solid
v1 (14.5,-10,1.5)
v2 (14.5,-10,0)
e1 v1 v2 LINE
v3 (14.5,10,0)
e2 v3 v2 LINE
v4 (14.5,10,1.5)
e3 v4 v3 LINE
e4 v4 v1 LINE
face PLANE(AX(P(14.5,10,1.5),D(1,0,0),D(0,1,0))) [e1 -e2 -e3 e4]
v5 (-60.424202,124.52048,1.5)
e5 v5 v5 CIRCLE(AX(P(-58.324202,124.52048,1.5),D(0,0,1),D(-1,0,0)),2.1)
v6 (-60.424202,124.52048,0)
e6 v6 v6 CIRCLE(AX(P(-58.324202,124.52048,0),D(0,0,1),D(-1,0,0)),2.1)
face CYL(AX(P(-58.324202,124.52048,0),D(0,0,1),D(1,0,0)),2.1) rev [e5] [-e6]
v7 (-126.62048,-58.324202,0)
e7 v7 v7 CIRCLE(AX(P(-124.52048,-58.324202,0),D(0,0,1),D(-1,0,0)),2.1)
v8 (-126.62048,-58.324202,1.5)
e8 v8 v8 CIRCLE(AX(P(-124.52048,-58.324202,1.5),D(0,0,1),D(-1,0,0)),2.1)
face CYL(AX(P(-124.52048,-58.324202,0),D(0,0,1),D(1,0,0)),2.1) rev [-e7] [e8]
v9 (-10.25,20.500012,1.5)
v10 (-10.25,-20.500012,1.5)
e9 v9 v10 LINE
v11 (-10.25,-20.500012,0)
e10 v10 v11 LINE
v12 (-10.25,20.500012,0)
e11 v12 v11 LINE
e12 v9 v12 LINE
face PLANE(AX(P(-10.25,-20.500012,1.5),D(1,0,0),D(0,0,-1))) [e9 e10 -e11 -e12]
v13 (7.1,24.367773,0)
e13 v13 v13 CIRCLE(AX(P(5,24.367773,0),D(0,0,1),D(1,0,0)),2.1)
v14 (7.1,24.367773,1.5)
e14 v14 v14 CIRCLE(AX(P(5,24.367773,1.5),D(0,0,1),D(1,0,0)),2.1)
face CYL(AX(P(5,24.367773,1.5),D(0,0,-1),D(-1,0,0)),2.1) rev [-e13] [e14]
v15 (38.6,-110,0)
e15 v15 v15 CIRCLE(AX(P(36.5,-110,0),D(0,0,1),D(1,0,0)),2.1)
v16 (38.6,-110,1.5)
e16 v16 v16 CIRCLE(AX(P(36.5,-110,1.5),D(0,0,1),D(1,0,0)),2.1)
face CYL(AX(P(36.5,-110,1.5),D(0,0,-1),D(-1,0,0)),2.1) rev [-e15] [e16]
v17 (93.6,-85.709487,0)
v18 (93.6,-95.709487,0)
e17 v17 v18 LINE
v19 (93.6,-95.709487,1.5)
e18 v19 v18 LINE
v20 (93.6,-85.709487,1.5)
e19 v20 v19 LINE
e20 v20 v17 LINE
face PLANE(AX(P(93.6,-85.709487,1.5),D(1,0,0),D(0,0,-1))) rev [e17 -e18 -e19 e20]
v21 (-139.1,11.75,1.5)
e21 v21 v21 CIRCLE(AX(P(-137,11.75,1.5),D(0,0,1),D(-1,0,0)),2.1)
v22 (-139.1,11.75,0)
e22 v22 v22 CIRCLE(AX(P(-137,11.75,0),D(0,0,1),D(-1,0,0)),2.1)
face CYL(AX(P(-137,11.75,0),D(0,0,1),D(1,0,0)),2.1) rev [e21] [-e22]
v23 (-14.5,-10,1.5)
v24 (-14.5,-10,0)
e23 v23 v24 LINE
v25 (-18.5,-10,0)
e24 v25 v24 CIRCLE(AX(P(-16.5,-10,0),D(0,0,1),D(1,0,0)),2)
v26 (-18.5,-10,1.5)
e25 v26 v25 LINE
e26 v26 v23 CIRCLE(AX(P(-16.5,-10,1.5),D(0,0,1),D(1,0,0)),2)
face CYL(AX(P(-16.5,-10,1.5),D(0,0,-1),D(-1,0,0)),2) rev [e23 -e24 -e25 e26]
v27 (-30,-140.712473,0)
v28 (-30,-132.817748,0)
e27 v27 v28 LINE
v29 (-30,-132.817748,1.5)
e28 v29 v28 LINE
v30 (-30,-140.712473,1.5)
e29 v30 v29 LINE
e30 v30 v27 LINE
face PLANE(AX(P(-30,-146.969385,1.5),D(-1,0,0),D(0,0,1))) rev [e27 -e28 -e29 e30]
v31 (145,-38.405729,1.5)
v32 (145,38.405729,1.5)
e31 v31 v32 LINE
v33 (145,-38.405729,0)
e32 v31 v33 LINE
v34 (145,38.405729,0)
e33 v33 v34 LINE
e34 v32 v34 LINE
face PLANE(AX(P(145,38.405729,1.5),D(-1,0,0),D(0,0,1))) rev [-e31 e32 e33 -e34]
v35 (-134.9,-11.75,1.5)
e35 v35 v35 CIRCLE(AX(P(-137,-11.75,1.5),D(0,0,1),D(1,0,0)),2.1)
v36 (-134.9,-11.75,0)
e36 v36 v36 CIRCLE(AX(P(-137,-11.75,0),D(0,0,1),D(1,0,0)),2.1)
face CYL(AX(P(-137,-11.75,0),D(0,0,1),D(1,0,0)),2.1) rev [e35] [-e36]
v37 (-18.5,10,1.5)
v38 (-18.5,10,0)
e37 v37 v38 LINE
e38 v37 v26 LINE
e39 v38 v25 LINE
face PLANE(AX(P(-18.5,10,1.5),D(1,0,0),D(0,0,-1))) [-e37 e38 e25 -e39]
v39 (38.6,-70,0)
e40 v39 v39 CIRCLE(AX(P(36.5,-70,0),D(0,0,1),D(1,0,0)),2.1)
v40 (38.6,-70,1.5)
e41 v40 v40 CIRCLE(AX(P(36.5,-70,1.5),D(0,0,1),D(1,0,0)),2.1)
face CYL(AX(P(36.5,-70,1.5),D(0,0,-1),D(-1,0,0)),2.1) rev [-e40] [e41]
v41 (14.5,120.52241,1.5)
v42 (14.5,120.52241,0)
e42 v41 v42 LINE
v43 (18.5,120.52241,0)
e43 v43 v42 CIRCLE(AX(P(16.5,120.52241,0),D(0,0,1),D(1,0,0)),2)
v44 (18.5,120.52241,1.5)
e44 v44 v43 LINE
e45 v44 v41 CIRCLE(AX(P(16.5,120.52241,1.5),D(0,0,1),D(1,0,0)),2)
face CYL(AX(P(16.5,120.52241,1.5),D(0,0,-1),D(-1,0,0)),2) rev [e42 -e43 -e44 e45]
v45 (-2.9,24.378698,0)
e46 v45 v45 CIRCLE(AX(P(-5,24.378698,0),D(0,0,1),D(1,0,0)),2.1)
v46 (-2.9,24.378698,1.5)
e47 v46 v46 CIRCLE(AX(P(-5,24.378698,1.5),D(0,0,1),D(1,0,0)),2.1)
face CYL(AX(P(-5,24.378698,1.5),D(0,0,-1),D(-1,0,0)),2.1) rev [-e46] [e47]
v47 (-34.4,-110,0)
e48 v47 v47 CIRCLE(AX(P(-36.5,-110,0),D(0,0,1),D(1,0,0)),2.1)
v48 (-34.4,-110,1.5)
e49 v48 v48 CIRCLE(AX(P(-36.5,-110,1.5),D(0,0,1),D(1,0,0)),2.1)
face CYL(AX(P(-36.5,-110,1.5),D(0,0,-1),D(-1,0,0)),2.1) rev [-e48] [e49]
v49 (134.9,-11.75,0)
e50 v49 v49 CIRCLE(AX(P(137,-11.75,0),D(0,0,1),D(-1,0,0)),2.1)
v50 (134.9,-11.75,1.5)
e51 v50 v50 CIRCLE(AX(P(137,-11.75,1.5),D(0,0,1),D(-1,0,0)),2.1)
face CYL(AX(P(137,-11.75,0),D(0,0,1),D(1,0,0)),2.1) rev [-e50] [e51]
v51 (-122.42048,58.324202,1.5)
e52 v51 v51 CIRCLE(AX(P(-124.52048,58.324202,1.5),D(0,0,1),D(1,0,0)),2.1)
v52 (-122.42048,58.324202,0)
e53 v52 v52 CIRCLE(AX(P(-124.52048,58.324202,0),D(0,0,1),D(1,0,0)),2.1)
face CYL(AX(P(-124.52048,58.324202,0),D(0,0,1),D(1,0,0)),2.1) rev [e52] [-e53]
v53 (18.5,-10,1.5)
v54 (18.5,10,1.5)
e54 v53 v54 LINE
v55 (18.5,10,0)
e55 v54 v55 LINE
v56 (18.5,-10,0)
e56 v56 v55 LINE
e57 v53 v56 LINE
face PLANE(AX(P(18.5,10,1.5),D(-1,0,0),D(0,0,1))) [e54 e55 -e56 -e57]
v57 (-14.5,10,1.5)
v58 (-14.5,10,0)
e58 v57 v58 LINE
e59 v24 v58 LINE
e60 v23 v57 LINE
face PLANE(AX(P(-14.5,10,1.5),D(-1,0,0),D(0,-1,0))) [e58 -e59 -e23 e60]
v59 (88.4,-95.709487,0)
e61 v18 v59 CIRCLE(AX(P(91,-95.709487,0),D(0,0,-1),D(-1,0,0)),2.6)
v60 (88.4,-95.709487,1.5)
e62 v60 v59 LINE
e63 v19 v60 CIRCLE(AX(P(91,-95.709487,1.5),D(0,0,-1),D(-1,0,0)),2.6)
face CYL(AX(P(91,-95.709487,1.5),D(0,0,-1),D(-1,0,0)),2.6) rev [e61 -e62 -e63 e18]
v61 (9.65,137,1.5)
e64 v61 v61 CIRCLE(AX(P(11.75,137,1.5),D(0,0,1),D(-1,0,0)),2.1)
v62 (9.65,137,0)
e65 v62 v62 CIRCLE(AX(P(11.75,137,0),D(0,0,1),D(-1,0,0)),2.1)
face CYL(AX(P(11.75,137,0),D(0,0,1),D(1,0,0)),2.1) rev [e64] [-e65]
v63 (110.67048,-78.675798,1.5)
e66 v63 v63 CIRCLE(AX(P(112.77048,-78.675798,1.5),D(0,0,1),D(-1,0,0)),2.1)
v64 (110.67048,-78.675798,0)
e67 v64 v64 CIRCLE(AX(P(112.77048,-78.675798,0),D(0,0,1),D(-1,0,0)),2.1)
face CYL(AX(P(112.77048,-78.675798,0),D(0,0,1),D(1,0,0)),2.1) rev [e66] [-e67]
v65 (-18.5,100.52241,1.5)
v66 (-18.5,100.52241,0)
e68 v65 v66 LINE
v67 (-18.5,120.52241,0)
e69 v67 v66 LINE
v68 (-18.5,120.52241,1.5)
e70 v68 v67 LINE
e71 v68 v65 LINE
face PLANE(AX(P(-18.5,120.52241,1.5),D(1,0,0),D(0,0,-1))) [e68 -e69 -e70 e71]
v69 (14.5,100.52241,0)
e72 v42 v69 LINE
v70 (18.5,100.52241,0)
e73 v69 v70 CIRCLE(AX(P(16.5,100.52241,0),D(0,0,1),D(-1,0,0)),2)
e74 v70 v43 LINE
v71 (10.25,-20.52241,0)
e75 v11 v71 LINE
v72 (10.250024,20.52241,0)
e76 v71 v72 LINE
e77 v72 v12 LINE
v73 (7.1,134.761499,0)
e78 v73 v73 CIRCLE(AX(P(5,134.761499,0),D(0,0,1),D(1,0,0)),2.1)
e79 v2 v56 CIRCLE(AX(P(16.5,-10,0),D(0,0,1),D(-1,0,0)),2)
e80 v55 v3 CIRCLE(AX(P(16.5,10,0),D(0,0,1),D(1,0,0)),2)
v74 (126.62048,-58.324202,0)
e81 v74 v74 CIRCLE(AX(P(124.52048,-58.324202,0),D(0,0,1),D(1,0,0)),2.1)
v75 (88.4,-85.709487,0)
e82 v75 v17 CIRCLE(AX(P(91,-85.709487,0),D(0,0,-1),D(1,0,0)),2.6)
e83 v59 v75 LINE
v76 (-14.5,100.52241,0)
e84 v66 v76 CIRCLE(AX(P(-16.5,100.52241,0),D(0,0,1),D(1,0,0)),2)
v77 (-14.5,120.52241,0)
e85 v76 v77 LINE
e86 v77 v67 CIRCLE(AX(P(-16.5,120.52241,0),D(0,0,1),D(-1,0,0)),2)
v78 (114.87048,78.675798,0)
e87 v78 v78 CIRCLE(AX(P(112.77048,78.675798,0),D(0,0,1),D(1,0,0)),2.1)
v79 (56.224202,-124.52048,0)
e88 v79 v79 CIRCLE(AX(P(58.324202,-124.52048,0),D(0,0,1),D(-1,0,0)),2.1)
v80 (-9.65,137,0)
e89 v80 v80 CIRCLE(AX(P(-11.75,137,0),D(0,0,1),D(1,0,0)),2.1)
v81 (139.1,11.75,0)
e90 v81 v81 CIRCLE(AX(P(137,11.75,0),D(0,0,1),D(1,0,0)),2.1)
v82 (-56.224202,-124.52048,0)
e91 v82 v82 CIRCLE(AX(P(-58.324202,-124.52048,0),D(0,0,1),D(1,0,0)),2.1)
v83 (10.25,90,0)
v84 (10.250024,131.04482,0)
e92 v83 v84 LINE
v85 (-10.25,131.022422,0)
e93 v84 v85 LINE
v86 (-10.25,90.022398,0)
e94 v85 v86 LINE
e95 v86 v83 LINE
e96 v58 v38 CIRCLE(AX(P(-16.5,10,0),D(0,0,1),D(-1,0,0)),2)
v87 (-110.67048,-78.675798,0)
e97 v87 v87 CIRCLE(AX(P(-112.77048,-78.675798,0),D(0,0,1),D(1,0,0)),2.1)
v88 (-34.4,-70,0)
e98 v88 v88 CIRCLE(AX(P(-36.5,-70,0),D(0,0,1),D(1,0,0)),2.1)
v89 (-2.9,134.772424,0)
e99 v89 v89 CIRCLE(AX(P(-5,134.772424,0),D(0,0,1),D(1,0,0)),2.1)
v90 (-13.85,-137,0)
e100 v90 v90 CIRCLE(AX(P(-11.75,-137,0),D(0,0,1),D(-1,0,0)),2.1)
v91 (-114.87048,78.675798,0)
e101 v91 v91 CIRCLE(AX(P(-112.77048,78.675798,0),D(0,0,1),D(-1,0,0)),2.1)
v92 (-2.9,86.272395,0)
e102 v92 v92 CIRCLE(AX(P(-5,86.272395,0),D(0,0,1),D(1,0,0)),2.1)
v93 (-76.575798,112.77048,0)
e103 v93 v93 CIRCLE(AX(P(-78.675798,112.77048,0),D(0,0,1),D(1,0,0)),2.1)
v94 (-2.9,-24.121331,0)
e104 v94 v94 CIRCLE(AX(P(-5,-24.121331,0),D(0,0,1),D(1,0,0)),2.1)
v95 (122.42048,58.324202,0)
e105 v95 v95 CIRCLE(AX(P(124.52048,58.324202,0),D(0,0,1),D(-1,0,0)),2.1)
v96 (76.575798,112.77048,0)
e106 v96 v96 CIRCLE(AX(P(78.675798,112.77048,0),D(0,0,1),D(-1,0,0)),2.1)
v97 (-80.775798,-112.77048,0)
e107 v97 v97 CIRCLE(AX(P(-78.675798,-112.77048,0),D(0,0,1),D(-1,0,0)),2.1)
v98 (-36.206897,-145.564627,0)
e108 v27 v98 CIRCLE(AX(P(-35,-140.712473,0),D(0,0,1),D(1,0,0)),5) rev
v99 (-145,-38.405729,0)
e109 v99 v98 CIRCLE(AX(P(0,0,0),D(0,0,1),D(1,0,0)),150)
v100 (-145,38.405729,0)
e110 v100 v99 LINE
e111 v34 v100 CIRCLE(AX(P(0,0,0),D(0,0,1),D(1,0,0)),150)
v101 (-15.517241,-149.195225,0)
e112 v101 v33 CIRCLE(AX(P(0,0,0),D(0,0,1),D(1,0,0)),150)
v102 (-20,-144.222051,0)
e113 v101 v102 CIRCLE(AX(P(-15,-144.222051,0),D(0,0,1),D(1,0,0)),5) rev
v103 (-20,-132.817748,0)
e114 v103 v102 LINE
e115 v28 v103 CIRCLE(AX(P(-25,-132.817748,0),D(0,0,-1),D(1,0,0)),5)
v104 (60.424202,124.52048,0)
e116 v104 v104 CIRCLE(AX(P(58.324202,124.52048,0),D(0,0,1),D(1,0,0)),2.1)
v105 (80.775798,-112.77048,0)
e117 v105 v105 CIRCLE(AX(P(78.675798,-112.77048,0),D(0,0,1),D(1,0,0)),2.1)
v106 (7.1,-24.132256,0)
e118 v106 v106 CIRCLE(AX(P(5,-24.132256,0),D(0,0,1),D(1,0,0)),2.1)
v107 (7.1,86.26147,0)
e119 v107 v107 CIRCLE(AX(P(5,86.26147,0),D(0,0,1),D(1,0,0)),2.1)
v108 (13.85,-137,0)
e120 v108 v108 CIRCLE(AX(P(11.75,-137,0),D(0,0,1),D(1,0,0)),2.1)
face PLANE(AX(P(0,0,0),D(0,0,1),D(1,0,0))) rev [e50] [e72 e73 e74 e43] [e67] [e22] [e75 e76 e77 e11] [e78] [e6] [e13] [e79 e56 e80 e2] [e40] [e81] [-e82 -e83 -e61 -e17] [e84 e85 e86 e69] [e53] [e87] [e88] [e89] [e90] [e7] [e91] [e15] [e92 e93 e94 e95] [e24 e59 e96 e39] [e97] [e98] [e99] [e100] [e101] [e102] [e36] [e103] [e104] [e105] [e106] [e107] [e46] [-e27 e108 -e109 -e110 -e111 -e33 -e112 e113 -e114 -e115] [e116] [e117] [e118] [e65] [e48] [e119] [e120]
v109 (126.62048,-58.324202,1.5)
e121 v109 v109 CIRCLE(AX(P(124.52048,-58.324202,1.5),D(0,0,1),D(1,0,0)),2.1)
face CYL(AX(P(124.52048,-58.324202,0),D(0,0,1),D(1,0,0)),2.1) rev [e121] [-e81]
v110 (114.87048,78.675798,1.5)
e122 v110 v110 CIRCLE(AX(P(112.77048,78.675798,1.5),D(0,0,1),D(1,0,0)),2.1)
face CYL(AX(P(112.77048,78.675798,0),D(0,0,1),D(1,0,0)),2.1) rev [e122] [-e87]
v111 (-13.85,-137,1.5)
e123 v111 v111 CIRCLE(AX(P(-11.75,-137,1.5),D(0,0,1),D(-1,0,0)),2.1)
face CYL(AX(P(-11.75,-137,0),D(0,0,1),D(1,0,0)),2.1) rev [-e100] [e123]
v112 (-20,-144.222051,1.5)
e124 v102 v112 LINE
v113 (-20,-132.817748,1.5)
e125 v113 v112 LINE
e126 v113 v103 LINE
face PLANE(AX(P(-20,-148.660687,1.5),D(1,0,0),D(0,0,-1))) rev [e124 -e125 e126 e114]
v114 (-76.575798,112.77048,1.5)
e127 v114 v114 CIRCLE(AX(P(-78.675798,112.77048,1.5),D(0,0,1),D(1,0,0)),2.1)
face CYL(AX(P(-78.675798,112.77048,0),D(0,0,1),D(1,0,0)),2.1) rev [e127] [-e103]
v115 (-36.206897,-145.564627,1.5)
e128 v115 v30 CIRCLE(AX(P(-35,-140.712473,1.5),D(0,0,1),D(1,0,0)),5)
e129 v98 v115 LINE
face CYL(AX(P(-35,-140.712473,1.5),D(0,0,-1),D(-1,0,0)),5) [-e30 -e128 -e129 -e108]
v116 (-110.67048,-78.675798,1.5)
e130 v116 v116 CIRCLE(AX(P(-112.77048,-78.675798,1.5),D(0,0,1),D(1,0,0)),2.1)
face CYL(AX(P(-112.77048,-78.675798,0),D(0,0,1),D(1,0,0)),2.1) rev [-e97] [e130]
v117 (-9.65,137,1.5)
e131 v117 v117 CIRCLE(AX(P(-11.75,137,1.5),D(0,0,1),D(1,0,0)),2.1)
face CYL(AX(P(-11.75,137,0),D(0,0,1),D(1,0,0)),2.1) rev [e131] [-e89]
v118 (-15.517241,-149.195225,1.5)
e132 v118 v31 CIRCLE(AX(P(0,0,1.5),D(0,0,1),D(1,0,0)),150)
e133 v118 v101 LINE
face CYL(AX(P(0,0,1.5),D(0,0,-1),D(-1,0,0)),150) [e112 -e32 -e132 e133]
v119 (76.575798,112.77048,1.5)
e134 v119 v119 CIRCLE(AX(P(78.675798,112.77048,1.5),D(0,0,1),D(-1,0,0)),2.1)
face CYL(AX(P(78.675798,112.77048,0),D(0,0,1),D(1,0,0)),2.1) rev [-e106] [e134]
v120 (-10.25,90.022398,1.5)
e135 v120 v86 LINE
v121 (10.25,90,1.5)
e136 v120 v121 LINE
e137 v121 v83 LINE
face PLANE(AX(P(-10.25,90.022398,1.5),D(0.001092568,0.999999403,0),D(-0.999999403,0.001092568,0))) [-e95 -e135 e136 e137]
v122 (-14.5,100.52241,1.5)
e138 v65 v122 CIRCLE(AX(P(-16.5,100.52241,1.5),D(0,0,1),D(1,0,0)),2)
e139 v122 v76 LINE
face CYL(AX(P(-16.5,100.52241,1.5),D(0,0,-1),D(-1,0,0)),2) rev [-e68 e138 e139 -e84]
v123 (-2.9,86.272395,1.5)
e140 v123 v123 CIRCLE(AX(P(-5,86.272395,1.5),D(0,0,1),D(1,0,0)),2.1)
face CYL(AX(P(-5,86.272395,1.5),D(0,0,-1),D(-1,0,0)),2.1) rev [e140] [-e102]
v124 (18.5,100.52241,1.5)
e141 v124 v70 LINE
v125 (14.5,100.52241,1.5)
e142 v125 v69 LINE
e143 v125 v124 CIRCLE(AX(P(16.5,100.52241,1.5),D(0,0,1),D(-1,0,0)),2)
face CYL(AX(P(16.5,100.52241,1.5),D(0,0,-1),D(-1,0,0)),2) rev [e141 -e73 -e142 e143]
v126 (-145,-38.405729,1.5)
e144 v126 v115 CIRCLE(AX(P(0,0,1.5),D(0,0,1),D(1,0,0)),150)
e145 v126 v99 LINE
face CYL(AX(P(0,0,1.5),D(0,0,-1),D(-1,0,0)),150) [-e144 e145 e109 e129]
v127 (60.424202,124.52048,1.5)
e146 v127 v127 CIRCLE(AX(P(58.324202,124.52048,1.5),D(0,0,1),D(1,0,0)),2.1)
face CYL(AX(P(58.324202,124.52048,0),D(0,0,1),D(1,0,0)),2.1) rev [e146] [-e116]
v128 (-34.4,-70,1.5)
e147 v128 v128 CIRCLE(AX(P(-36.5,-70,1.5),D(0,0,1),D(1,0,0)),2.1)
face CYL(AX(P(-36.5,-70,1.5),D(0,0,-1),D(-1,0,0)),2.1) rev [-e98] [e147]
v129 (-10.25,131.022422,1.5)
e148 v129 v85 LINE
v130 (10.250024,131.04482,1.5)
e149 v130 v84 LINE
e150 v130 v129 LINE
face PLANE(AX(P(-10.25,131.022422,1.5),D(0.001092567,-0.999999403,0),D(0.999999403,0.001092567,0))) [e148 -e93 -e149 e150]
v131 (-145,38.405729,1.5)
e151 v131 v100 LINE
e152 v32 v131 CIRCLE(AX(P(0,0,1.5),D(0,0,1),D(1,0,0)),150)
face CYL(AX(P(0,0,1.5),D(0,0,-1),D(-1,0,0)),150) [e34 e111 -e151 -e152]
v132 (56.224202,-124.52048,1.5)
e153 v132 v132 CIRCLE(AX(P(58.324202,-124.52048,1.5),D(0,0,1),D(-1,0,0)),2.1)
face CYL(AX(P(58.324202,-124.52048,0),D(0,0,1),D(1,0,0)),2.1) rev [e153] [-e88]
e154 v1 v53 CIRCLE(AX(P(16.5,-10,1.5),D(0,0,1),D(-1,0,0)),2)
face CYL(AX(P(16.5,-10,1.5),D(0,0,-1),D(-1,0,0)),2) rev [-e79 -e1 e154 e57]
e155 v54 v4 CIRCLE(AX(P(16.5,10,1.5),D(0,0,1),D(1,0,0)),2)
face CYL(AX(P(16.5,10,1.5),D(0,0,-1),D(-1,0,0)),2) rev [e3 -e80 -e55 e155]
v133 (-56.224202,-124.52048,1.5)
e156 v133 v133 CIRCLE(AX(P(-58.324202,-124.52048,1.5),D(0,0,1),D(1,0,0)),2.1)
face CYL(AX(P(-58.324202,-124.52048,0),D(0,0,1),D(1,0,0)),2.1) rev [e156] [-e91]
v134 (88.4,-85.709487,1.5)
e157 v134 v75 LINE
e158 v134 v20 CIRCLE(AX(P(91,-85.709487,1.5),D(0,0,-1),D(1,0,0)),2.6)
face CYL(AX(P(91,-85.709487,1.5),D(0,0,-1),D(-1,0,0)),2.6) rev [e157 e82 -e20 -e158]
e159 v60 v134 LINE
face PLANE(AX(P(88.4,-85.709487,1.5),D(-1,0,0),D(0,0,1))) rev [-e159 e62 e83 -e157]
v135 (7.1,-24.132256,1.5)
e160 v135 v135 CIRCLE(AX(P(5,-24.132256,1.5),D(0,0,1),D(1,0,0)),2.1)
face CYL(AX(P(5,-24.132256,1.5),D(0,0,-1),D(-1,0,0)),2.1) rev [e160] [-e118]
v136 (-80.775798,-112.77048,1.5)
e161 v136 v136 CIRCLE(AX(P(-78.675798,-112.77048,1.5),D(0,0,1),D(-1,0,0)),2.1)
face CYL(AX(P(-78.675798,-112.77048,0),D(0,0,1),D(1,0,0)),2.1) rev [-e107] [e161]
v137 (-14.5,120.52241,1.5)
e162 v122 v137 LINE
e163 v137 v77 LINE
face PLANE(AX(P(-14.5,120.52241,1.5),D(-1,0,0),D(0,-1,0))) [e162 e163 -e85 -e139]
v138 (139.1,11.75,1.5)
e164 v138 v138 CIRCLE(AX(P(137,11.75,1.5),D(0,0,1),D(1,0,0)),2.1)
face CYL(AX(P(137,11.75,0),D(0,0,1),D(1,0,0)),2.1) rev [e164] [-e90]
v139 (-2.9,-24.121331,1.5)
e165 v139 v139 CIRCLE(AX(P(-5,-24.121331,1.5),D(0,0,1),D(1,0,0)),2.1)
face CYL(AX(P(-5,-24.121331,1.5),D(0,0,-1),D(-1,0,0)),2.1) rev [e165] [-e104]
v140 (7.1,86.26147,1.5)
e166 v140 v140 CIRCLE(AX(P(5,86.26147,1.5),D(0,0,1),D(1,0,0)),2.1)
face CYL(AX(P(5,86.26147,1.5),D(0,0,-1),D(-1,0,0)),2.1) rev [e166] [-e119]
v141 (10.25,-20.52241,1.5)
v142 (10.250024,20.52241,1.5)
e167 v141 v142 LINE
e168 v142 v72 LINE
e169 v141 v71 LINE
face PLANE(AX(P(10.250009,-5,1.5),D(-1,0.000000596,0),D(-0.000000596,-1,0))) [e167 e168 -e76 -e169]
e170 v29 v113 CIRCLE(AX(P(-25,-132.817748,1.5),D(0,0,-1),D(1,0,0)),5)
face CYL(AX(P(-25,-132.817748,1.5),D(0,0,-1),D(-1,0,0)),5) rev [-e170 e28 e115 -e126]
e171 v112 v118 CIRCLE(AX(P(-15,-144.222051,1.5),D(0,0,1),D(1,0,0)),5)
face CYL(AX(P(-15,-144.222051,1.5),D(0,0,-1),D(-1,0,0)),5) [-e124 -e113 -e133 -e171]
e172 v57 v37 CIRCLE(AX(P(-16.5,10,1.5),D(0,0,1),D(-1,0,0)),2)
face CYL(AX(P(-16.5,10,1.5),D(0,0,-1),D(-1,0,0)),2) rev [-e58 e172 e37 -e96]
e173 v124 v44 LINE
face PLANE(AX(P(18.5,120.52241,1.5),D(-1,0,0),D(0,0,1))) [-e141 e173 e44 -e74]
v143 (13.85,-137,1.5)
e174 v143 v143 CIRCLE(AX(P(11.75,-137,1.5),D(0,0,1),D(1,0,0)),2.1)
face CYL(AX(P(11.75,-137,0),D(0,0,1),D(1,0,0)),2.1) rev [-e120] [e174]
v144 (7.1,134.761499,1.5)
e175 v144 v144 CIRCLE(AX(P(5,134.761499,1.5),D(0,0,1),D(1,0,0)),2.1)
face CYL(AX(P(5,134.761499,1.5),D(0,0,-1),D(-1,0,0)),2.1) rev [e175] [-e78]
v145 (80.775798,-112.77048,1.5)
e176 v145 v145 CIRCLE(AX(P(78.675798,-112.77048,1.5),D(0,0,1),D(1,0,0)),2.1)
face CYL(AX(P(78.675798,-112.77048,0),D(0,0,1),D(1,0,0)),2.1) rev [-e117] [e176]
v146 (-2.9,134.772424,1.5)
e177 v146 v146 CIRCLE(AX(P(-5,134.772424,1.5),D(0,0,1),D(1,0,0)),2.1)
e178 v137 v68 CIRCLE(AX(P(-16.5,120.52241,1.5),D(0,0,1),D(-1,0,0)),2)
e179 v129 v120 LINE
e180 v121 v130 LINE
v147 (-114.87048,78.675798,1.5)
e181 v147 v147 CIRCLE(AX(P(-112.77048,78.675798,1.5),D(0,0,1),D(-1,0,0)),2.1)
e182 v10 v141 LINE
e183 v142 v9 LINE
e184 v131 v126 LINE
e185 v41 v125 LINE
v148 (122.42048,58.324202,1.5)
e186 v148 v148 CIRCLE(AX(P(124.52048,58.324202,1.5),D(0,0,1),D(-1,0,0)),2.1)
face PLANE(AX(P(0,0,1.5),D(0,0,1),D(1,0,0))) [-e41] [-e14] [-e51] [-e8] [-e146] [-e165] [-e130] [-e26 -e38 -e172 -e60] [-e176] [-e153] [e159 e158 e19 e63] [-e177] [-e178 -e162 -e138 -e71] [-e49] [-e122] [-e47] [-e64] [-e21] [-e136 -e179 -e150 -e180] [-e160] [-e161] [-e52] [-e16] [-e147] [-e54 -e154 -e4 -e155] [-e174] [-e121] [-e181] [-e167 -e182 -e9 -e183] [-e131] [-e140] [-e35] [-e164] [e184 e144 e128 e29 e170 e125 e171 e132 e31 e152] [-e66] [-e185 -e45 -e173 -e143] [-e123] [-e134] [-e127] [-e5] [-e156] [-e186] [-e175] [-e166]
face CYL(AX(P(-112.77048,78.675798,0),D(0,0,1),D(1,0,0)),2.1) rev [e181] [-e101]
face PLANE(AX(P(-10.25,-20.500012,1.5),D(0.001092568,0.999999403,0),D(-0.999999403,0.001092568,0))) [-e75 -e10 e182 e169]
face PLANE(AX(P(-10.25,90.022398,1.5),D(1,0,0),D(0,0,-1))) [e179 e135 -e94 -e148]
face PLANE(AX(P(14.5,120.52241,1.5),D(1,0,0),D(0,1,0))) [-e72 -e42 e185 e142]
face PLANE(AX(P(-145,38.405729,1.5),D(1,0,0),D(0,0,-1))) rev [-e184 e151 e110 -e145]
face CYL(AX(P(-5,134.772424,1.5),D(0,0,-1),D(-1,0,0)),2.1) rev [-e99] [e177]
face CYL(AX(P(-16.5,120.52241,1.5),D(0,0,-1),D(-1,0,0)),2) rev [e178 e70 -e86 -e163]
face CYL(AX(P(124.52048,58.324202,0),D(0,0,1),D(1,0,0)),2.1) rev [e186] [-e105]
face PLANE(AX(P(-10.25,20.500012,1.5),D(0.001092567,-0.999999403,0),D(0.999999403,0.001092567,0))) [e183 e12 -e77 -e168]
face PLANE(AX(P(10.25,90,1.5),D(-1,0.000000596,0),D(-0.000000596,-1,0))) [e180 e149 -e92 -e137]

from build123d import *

# Parameters (mm, degrees)
SM_BASE_FLANGE_1_OUTLINE_R = 2.1
SM_BASE_FLANGE_1_DEPTH     = 1.5
CUT_EXTRUDE_2_DEPTH        = 1.5
FILLET_1_R                 = 5
SKETCH_8_R                 = 2.1
CUT_EXTRUDE_5_DEPTH        = 1.5


# Read off the part's stored shape, not the designer's step: 基体-法兰1
with BuildPart() as part:
    # 基体-法兰1 outline → 基体-法兰1 (new body)
    with BuildSketch(Plane.XY):
        with BuildLine():
            ThreePointArc((-20, -148.660687473), (83.338400401, -124.718527167), (145, -38.405728739))
            Line((145, -38.405728739), (145, 38.405728739))
            ThreePointArc((145, 38.405728739), (0, 150), (-145, 38.405728739))
            Line((-145, 38.405728739), (-145, -38.405728739))
            ThreePointArc((-145, -38.405728739), (-102.969737504, -109.074438611), (-30, -146.969384567))
            Line((-30, -146.969384567), (-30, -132.817748132))
            ThreePointArc((-30, -132.817748132), (-25, -127.817748132), (-20, -132.817748132))
            Line((-20, -132.817748132), (-20, -148.660687473))
        make_face()
        with Locations((-36.5, -110)):
            Circle(SM_BASE_FLANGE_1_OUTLINE_R, mode=Mode.SUBTRACT)
        with Locations((-36.5, -70)):
            Circle(SM_BASE_FLANGE_1_OUTLINE_R, mode=Mode.SUBTRACT)
        with Locations((-5, -24.121330526)):
            Circle(SM_BASE_FLANGE_1_OUTLINE_R, mode=Mode.SUBTRACT)
        with BuildLine():
            Line((-14.5, 10), (-14.5, -10))
            ThreePointArc((-14.5, -10), (-16.5, -12), (-18.5, -10))
            Line((-18.5, -10), (-18.5, 10))
            ThreePointArc((-18.5, 10), (-16.5, 12), (-14.5, 10))
        make_face(mode=Mode.SUBTRACT)
        with Locations((36.5, -110)):
            Circle(SM_BASE_FLANGE_1_OUTLINE_R, mode=Mode.SUBTRACT)
        with Locations((36.5, -70)):
            Circle(SM_BASE_FLANGE_1_OUTLINE_R, mode=Mode.SUBTRACT)
        with Locations((5, -24.132256214)):
            Circle(SM_BASE_FLANGE_1_OUTLINE_R, mode=Mode.SUBTRACT)
        Polygon((-10.25, 20.500012235), (10.250024471, 20.522409895), (10.25, -20.522409895), (-10.25, -20.500012235), align=None, mode=Mode.SUBTRACT)
        with BuildLine():
            Line((14.5, -10), (14.5, 10))
            ThreePointArc((14.5, 10), (16.5, 12), (18.5, 10))
            Line((18.5, 10), (18.5, -10))
            ThreePointArc((18.5, -10), (16.5, -12), (14.5, -10))
        make_face(mode=Mode.SUBTRACT)
        with Locations((-5, 24.378698421)):
            Circle(SM_BASE_FLANGE_1_OUTLINE_R, mode=Mode.SUBTRACT)
        with Locations((-5, 86.272395421)):
            Circle(SM_BASE_FLANGE_1_OUTLINE_R, mode=Mode.SUBTRACT)
        with BuildLine():
            Line((-14.5, 120.522409895), (-14.5, 100.522409895))
            ThreePointArc((-14.5, 100.522409895), (-16.5, 98.522409895), (-18.5, 100.522409895))
            Line((-18.5, 100.522409895), (-18.5, 120.522409895))
            ThreePointArc((-18.5, 120.522409895), (-16.5, 122.522409895), (-14.5, 120.522409895))
        make_face(mode=Mode.SUBTRACT)
        with Locations((-5, 134.772424369)):
            Circle(SM_BASE_FLANGE_1_OUTLINE_R, mode=Mode.SUBTRACT)
        with Locations((5, 24.367772734)):
            Circle(SM_BASE_FLANGE_1_OUTLINE_R, mode=Mode.SUBTRACT)
        with Locations((5, 86.261469734)):
            Circle(SM_BASE_FLANGE_1_OUTLINE_R, mode=Mode.SUBTRACT)
        Polygon((-10.25, 90.022397659), (-10.25, 131.02242213), (10.250024471, 131.04481979), (10.25, 90), align=None, mode=Mode.SUBTRACT)
        with BuildLine():
            Line((14.5, 100.522409895), (14.5, 120.522409895))
            ThreePointArc((14.5, 120.522409895), (16.5, 122.522409895), (18.5, 120.522409895))
            Line((18.5, 120.522409895), (18.5, 100.522409895))
            ThreePointArc((18.5, 100.522409895), (16.5, 98.522409895), (14.5, 100.522409895))
        make_face(mode=Mode.SUBTRACT)
        with Locations((5, 134.761498681)):
            Circle(SM_BASE_FLANGE_1_OUTLINE_R, mode=Mode.SUBTRACT)
    extrude(amount=SM_BASE_FLANGE_1_DEPTH)

    # 草图3 → 切除-拉伸2 (cut)
    with BuildSketch(Plane(origin=(0, 0, 0), x_dir=(-1, 0, 0), z_dir=(0, 0, -1))):
        with BuildLine():
            Line((-93.6, -85.709487412), (-93.6, -95.709487412))
            ThreePointArc((-93.6, -95.709487412), (-91, -98.309487412), (-88.4, -95.709487412))
            Line((-88.4, -95.709487412), (-88.4, -85.709487412))
            ThreePointArc((-88.4, -85.709487412), (-91, -83.109487412), (-93.6, -85.709487412))
        make_face()
    extrude(amount=-CUT_EXTRUDE_2_DEPTH, mode=Mode.SUBTRACT)

    # 圆角1
    fillet_1_edges = [part.edges().sort_by_distance(p)[0] for p in [
        (-20, -148.660687473, 0.75),
        (-30, -146.969384567, 0.75),
    ]]
    fillet(fillet_1_edges, radius=FILLET_1_R)

    # 草图8 → 切除-拉伸5 (cut)
    with BuildSketch(Plane.XY.offset(1.5)):
        with Locations(Location((112.770480318, -78.675798494, 0), (0, 0, 180))):
            Circle(SKETCH_8_R)
        with Locations((137, 11.75)):
            Circle(SKETCH_8_R)
        with Locations(Location((137, -11.75, 0), (0, 0, 180))):
            Circle(SKETCH_8_R)
        with Locations((124.520480318, -58.324201506)):
            Circle(SKETCH_8_R)
        with Locations(Location((58.324201506, -124.520480318, 0), (0, 0, 180))):
            Circle(SKETCH_8_R)
        with Locations((78.675798494, -112.770480318)):
            Circle(SKETCH_8_R)
        with Locations(Location((-11.75, -137, 0), (0, 0, 180))):
            Circle(SKETCH_8_R)
        with Locations((11.75, -137)):
            Circle(SKETCH_8_R)
        with Locations(Location((-78.675798494, -112.770480318, 0), (0, 0, 180))):
            Circle(SKETCH_8_R)
        with Locations((-58.324201506, -124.520480318)):
            Circle(SKETCH_8_R)
        with Locations(Location((-124.520480318, -58.324201506, 0), (0, 0, 180))):
            Circle(SKETCH_8_R)
        with Locations((-112.770480318, -78.675798494)):
            Circle(SKETCH_8_R)
        with Locations(Location((-137, 11.75, 0), (0, 0, 180))):
            Circle(SKETCH_8_R)
        with Locations((-137, -11.75)):
            Circle(SKETCH_8_R)
        with Locations(Location((-112.770480318, 78.675798494, 0), (0, 0, 180))):
            Circle(SKETCH_8_R)
        with Locations((-124.520480318, 58.324201506)):
            Circle(SKETCH_8_R)
        with Locations(Location((-58.324201506, 124.520480318, 0), (0, 0, 180))):
            Circle(SKETCH_8_R)
        with Locations((-78.675798494, 112.770480318)):
            Circle(SKETCH_8_R)
        with Locations(Location((11.75, 137, 0), (0, 0, 180))):
            Circle(SKETCH_8_R)
        with Locations((-11.75, 137)):
            Circle(SKETCH_8_R)
        with Locations(Location((78.675798494, 112.770480318, 0), (0, 0, 180))):
            Circle(SKETCH_8_R)
        with Locations((58.324201506, 124.520480318)):
            Circle(SKETCH_8_R)
        with Locations(Location((124.520480318, 58.324201506, 0), (0, 0, 180))):
            Circle(SKETCH_8_R)
        with Locations((112.770480318, 78.675798494)):
            Circle(SKETCH_8_R)
    extrude(amount=-CUT_EXTRUDE_5_DEPTH, mode=Mode.SUBTRACT)


solid = part.part
